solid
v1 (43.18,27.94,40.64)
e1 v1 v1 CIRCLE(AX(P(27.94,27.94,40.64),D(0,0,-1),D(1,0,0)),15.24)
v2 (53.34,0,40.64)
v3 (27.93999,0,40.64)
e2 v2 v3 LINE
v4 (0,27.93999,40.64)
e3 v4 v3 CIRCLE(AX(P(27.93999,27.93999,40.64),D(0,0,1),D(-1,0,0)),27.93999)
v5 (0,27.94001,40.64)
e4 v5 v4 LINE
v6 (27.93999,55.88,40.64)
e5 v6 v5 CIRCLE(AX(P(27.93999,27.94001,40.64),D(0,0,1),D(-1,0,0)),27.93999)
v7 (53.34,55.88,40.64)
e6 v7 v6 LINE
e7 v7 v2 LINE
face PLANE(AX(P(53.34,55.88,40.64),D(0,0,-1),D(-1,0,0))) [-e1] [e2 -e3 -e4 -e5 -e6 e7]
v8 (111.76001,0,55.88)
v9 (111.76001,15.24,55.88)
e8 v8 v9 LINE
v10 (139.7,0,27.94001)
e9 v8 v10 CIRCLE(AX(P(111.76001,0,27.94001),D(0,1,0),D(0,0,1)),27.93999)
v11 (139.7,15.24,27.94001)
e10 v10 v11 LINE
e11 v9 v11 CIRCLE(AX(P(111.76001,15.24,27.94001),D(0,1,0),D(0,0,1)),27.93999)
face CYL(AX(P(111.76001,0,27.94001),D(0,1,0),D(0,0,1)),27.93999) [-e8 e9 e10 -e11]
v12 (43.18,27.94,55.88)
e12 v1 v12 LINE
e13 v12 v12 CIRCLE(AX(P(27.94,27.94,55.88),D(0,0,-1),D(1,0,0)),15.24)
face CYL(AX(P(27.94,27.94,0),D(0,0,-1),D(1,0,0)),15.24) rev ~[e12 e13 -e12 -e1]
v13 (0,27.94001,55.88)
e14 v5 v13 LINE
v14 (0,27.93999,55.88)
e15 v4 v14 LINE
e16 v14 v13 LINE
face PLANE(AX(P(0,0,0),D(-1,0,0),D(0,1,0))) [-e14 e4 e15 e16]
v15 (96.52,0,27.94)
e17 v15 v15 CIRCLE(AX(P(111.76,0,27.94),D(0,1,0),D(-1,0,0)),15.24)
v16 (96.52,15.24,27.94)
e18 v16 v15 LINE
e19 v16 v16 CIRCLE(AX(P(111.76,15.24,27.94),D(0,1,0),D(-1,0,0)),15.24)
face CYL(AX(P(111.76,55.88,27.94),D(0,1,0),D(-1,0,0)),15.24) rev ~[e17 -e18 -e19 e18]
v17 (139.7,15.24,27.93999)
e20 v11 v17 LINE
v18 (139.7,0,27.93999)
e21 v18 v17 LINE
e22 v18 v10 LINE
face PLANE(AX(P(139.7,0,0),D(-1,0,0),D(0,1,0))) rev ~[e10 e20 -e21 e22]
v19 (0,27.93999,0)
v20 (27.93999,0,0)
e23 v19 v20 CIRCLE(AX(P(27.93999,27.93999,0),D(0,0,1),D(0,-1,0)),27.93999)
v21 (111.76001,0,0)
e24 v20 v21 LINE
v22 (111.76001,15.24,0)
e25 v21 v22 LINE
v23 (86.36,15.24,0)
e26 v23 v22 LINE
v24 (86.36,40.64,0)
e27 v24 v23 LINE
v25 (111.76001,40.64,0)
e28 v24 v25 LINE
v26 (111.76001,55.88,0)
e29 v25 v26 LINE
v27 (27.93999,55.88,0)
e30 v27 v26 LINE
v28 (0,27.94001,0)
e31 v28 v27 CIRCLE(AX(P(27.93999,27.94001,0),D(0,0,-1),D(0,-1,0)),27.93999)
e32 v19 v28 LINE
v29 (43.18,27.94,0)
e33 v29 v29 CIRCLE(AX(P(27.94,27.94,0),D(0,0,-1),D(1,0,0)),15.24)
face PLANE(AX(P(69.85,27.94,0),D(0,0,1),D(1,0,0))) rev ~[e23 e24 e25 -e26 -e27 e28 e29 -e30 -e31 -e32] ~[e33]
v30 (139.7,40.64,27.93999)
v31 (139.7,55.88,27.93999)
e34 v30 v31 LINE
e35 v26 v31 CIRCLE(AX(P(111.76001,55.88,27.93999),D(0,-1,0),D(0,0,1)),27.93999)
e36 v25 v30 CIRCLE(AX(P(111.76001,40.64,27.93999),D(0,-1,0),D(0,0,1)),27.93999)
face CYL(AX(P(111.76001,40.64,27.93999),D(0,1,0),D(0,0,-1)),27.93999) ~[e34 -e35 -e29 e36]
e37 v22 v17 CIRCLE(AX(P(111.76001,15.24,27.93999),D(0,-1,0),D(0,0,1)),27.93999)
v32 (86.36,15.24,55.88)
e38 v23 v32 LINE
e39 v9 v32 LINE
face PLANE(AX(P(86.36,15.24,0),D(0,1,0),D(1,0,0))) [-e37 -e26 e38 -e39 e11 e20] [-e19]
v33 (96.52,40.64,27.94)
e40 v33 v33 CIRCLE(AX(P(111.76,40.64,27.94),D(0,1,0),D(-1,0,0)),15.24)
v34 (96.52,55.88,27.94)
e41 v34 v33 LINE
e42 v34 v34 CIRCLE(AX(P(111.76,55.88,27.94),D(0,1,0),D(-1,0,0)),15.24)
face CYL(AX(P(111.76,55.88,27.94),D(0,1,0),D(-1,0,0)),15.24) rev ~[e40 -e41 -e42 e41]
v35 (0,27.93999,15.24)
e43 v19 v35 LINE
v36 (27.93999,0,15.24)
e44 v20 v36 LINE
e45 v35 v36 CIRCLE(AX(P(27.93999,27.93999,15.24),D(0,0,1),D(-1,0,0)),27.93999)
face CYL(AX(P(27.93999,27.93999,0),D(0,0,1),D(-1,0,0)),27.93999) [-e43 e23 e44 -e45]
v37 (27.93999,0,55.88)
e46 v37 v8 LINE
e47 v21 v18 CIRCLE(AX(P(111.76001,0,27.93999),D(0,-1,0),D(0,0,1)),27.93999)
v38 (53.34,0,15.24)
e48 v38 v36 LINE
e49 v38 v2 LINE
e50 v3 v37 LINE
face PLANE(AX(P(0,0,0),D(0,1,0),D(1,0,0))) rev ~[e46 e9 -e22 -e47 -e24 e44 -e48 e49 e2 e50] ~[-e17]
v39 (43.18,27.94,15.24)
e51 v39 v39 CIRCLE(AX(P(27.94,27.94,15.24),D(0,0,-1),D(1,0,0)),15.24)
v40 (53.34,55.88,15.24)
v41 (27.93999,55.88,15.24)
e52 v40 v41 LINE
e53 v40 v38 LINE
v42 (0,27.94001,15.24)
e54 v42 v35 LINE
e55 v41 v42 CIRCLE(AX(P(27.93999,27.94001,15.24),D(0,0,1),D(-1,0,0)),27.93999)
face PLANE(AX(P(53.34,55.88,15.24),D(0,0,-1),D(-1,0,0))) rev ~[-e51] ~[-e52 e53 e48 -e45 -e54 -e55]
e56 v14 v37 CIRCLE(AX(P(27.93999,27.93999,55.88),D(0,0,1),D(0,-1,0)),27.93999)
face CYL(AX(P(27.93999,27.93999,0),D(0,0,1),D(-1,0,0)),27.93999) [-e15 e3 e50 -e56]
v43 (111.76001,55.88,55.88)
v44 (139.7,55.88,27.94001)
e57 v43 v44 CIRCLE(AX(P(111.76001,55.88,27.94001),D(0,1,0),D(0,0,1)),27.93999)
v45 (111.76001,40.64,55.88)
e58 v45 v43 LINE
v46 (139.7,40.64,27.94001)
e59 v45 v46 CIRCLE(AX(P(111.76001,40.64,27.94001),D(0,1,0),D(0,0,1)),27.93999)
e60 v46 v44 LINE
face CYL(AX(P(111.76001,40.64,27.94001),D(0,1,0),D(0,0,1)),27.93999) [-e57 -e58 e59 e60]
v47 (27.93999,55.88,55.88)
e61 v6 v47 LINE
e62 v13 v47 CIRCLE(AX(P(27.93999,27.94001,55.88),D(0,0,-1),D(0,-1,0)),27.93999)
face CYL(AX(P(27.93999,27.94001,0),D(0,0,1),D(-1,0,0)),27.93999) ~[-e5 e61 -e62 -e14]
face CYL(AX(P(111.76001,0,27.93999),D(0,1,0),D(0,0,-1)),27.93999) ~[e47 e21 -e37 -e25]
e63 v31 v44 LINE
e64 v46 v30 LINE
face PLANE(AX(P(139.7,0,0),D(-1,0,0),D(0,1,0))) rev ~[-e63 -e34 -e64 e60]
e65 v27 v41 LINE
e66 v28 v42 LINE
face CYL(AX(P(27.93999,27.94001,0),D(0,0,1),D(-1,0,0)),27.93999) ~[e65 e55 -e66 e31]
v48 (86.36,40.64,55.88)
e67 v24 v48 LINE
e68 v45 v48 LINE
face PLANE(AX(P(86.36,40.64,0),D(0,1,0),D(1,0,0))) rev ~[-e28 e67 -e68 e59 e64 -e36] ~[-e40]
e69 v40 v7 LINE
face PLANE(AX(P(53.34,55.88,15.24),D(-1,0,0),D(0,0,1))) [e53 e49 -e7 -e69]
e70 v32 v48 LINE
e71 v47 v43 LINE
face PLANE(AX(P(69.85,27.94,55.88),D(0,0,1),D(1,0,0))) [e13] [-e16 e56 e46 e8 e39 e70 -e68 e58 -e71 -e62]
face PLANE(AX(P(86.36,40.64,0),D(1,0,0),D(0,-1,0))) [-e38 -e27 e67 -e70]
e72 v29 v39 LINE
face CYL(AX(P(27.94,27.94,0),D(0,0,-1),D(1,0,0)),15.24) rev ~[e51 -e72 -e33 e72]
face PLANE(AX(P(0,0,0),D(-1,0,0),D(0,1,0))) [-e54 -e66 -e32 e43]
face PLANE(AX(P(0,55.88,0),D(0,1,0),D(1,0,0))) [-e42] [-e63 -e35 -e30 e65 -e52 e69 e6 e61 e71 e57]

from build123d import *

# Parameters (mm, degrees)
F0_W      = 139.7
F0_H      = 55.88
F1_DEPTH  = 55.88
F2_W      = 101.6
F2_H      = 25.4
F3_DEPTH  = 55.881
F4_R      = 27.93999
F5_R      = 15.24
F6_DEPTH  = 55.881
F7_W      = 76.2
F7_H      = 25.4
F8_DEPTH  = 55.881
F9_R      = 15.24
F10_DEPTH = 55.881


# Not quite as in the source:
# - a fillet or chamfer is up to 0.001 mm smaller than in the source, because OpenCascade refuses the exact size


with BuildPart() as f1:
    # F0 (on Top) → F1 (new body)
    with BuildSketch(Plane.XY):
        with Locations((69.85, 27.94)):
            Rectangle(F0_W, F0_H)
    extrude(amount=F1_DEPTH)

    # F2 (on face) → F3 (cut, through all)
    with BuildSketch(Plane(origin=(0, 0, 0), x_dir=(1, 0, 0), z_dir=(0, 0, -1))):
        with Locations((137.16, -27.94)):
            Rectangle(F2_W, F2_H)
    extrude(amount=-F3_DEPTH, mode=Mode.SUBTRACT)

    # F4 (radius 27.94 in the source; OpenCascade refuses exactly that, so slightly less here)
    f4_edges = [f1.edges().sort_by_distance(p)[0] for p in [
        (139.7, 48.26, 55.88),
        (139.7, 7.62, 55.88),
        (139.7, 7.62, 0),
        (139.7, 48.26, 0),
        (0, 55.88, 27.94),
        (0, 0, 27.94),
    ]]
    fillet(f4_edges, radius=F4_R)

    # F5 (on face) → F6 (cut, through all)
    with BuildSketch(Plane(origin=(0, 55.88, 0), x_dir=(-1, 0, 0), z_dir=(0, 1, 0))):
        with Locations((-111.76, 27.94)):
            Circle(F5_R)
    extrude(amount=-F6_DEPTH, mode=Mode.SUBTRACT)

    # F7 (on face) → F8 (cut, through all)
    with BuildSketch(Plane(origin=(0, 55.88, 0), x_dir=(-1, 0, 0), z_dir=(0, 1, 0))):
        with Locations((-15.24, 27.94)):
            Rectangle(F7_W, F7_H)
    extrude(amount=-F8_DEPTH, mode=Mode.SUBTRACT)

    # F9 (on face) → F10 (cut, through all)
    with BuildSketch(Plane(origin=(0, 0, 0), x_dir=(1, 0, 0), z_dir=(0, 0, -1))):
        with Locations((27.94, -27.94)):
            Circle(F9_R)
    extrude(amount=-F10_DEPTH, mode=Mode.SUBTRACT)


solid = f1.part
